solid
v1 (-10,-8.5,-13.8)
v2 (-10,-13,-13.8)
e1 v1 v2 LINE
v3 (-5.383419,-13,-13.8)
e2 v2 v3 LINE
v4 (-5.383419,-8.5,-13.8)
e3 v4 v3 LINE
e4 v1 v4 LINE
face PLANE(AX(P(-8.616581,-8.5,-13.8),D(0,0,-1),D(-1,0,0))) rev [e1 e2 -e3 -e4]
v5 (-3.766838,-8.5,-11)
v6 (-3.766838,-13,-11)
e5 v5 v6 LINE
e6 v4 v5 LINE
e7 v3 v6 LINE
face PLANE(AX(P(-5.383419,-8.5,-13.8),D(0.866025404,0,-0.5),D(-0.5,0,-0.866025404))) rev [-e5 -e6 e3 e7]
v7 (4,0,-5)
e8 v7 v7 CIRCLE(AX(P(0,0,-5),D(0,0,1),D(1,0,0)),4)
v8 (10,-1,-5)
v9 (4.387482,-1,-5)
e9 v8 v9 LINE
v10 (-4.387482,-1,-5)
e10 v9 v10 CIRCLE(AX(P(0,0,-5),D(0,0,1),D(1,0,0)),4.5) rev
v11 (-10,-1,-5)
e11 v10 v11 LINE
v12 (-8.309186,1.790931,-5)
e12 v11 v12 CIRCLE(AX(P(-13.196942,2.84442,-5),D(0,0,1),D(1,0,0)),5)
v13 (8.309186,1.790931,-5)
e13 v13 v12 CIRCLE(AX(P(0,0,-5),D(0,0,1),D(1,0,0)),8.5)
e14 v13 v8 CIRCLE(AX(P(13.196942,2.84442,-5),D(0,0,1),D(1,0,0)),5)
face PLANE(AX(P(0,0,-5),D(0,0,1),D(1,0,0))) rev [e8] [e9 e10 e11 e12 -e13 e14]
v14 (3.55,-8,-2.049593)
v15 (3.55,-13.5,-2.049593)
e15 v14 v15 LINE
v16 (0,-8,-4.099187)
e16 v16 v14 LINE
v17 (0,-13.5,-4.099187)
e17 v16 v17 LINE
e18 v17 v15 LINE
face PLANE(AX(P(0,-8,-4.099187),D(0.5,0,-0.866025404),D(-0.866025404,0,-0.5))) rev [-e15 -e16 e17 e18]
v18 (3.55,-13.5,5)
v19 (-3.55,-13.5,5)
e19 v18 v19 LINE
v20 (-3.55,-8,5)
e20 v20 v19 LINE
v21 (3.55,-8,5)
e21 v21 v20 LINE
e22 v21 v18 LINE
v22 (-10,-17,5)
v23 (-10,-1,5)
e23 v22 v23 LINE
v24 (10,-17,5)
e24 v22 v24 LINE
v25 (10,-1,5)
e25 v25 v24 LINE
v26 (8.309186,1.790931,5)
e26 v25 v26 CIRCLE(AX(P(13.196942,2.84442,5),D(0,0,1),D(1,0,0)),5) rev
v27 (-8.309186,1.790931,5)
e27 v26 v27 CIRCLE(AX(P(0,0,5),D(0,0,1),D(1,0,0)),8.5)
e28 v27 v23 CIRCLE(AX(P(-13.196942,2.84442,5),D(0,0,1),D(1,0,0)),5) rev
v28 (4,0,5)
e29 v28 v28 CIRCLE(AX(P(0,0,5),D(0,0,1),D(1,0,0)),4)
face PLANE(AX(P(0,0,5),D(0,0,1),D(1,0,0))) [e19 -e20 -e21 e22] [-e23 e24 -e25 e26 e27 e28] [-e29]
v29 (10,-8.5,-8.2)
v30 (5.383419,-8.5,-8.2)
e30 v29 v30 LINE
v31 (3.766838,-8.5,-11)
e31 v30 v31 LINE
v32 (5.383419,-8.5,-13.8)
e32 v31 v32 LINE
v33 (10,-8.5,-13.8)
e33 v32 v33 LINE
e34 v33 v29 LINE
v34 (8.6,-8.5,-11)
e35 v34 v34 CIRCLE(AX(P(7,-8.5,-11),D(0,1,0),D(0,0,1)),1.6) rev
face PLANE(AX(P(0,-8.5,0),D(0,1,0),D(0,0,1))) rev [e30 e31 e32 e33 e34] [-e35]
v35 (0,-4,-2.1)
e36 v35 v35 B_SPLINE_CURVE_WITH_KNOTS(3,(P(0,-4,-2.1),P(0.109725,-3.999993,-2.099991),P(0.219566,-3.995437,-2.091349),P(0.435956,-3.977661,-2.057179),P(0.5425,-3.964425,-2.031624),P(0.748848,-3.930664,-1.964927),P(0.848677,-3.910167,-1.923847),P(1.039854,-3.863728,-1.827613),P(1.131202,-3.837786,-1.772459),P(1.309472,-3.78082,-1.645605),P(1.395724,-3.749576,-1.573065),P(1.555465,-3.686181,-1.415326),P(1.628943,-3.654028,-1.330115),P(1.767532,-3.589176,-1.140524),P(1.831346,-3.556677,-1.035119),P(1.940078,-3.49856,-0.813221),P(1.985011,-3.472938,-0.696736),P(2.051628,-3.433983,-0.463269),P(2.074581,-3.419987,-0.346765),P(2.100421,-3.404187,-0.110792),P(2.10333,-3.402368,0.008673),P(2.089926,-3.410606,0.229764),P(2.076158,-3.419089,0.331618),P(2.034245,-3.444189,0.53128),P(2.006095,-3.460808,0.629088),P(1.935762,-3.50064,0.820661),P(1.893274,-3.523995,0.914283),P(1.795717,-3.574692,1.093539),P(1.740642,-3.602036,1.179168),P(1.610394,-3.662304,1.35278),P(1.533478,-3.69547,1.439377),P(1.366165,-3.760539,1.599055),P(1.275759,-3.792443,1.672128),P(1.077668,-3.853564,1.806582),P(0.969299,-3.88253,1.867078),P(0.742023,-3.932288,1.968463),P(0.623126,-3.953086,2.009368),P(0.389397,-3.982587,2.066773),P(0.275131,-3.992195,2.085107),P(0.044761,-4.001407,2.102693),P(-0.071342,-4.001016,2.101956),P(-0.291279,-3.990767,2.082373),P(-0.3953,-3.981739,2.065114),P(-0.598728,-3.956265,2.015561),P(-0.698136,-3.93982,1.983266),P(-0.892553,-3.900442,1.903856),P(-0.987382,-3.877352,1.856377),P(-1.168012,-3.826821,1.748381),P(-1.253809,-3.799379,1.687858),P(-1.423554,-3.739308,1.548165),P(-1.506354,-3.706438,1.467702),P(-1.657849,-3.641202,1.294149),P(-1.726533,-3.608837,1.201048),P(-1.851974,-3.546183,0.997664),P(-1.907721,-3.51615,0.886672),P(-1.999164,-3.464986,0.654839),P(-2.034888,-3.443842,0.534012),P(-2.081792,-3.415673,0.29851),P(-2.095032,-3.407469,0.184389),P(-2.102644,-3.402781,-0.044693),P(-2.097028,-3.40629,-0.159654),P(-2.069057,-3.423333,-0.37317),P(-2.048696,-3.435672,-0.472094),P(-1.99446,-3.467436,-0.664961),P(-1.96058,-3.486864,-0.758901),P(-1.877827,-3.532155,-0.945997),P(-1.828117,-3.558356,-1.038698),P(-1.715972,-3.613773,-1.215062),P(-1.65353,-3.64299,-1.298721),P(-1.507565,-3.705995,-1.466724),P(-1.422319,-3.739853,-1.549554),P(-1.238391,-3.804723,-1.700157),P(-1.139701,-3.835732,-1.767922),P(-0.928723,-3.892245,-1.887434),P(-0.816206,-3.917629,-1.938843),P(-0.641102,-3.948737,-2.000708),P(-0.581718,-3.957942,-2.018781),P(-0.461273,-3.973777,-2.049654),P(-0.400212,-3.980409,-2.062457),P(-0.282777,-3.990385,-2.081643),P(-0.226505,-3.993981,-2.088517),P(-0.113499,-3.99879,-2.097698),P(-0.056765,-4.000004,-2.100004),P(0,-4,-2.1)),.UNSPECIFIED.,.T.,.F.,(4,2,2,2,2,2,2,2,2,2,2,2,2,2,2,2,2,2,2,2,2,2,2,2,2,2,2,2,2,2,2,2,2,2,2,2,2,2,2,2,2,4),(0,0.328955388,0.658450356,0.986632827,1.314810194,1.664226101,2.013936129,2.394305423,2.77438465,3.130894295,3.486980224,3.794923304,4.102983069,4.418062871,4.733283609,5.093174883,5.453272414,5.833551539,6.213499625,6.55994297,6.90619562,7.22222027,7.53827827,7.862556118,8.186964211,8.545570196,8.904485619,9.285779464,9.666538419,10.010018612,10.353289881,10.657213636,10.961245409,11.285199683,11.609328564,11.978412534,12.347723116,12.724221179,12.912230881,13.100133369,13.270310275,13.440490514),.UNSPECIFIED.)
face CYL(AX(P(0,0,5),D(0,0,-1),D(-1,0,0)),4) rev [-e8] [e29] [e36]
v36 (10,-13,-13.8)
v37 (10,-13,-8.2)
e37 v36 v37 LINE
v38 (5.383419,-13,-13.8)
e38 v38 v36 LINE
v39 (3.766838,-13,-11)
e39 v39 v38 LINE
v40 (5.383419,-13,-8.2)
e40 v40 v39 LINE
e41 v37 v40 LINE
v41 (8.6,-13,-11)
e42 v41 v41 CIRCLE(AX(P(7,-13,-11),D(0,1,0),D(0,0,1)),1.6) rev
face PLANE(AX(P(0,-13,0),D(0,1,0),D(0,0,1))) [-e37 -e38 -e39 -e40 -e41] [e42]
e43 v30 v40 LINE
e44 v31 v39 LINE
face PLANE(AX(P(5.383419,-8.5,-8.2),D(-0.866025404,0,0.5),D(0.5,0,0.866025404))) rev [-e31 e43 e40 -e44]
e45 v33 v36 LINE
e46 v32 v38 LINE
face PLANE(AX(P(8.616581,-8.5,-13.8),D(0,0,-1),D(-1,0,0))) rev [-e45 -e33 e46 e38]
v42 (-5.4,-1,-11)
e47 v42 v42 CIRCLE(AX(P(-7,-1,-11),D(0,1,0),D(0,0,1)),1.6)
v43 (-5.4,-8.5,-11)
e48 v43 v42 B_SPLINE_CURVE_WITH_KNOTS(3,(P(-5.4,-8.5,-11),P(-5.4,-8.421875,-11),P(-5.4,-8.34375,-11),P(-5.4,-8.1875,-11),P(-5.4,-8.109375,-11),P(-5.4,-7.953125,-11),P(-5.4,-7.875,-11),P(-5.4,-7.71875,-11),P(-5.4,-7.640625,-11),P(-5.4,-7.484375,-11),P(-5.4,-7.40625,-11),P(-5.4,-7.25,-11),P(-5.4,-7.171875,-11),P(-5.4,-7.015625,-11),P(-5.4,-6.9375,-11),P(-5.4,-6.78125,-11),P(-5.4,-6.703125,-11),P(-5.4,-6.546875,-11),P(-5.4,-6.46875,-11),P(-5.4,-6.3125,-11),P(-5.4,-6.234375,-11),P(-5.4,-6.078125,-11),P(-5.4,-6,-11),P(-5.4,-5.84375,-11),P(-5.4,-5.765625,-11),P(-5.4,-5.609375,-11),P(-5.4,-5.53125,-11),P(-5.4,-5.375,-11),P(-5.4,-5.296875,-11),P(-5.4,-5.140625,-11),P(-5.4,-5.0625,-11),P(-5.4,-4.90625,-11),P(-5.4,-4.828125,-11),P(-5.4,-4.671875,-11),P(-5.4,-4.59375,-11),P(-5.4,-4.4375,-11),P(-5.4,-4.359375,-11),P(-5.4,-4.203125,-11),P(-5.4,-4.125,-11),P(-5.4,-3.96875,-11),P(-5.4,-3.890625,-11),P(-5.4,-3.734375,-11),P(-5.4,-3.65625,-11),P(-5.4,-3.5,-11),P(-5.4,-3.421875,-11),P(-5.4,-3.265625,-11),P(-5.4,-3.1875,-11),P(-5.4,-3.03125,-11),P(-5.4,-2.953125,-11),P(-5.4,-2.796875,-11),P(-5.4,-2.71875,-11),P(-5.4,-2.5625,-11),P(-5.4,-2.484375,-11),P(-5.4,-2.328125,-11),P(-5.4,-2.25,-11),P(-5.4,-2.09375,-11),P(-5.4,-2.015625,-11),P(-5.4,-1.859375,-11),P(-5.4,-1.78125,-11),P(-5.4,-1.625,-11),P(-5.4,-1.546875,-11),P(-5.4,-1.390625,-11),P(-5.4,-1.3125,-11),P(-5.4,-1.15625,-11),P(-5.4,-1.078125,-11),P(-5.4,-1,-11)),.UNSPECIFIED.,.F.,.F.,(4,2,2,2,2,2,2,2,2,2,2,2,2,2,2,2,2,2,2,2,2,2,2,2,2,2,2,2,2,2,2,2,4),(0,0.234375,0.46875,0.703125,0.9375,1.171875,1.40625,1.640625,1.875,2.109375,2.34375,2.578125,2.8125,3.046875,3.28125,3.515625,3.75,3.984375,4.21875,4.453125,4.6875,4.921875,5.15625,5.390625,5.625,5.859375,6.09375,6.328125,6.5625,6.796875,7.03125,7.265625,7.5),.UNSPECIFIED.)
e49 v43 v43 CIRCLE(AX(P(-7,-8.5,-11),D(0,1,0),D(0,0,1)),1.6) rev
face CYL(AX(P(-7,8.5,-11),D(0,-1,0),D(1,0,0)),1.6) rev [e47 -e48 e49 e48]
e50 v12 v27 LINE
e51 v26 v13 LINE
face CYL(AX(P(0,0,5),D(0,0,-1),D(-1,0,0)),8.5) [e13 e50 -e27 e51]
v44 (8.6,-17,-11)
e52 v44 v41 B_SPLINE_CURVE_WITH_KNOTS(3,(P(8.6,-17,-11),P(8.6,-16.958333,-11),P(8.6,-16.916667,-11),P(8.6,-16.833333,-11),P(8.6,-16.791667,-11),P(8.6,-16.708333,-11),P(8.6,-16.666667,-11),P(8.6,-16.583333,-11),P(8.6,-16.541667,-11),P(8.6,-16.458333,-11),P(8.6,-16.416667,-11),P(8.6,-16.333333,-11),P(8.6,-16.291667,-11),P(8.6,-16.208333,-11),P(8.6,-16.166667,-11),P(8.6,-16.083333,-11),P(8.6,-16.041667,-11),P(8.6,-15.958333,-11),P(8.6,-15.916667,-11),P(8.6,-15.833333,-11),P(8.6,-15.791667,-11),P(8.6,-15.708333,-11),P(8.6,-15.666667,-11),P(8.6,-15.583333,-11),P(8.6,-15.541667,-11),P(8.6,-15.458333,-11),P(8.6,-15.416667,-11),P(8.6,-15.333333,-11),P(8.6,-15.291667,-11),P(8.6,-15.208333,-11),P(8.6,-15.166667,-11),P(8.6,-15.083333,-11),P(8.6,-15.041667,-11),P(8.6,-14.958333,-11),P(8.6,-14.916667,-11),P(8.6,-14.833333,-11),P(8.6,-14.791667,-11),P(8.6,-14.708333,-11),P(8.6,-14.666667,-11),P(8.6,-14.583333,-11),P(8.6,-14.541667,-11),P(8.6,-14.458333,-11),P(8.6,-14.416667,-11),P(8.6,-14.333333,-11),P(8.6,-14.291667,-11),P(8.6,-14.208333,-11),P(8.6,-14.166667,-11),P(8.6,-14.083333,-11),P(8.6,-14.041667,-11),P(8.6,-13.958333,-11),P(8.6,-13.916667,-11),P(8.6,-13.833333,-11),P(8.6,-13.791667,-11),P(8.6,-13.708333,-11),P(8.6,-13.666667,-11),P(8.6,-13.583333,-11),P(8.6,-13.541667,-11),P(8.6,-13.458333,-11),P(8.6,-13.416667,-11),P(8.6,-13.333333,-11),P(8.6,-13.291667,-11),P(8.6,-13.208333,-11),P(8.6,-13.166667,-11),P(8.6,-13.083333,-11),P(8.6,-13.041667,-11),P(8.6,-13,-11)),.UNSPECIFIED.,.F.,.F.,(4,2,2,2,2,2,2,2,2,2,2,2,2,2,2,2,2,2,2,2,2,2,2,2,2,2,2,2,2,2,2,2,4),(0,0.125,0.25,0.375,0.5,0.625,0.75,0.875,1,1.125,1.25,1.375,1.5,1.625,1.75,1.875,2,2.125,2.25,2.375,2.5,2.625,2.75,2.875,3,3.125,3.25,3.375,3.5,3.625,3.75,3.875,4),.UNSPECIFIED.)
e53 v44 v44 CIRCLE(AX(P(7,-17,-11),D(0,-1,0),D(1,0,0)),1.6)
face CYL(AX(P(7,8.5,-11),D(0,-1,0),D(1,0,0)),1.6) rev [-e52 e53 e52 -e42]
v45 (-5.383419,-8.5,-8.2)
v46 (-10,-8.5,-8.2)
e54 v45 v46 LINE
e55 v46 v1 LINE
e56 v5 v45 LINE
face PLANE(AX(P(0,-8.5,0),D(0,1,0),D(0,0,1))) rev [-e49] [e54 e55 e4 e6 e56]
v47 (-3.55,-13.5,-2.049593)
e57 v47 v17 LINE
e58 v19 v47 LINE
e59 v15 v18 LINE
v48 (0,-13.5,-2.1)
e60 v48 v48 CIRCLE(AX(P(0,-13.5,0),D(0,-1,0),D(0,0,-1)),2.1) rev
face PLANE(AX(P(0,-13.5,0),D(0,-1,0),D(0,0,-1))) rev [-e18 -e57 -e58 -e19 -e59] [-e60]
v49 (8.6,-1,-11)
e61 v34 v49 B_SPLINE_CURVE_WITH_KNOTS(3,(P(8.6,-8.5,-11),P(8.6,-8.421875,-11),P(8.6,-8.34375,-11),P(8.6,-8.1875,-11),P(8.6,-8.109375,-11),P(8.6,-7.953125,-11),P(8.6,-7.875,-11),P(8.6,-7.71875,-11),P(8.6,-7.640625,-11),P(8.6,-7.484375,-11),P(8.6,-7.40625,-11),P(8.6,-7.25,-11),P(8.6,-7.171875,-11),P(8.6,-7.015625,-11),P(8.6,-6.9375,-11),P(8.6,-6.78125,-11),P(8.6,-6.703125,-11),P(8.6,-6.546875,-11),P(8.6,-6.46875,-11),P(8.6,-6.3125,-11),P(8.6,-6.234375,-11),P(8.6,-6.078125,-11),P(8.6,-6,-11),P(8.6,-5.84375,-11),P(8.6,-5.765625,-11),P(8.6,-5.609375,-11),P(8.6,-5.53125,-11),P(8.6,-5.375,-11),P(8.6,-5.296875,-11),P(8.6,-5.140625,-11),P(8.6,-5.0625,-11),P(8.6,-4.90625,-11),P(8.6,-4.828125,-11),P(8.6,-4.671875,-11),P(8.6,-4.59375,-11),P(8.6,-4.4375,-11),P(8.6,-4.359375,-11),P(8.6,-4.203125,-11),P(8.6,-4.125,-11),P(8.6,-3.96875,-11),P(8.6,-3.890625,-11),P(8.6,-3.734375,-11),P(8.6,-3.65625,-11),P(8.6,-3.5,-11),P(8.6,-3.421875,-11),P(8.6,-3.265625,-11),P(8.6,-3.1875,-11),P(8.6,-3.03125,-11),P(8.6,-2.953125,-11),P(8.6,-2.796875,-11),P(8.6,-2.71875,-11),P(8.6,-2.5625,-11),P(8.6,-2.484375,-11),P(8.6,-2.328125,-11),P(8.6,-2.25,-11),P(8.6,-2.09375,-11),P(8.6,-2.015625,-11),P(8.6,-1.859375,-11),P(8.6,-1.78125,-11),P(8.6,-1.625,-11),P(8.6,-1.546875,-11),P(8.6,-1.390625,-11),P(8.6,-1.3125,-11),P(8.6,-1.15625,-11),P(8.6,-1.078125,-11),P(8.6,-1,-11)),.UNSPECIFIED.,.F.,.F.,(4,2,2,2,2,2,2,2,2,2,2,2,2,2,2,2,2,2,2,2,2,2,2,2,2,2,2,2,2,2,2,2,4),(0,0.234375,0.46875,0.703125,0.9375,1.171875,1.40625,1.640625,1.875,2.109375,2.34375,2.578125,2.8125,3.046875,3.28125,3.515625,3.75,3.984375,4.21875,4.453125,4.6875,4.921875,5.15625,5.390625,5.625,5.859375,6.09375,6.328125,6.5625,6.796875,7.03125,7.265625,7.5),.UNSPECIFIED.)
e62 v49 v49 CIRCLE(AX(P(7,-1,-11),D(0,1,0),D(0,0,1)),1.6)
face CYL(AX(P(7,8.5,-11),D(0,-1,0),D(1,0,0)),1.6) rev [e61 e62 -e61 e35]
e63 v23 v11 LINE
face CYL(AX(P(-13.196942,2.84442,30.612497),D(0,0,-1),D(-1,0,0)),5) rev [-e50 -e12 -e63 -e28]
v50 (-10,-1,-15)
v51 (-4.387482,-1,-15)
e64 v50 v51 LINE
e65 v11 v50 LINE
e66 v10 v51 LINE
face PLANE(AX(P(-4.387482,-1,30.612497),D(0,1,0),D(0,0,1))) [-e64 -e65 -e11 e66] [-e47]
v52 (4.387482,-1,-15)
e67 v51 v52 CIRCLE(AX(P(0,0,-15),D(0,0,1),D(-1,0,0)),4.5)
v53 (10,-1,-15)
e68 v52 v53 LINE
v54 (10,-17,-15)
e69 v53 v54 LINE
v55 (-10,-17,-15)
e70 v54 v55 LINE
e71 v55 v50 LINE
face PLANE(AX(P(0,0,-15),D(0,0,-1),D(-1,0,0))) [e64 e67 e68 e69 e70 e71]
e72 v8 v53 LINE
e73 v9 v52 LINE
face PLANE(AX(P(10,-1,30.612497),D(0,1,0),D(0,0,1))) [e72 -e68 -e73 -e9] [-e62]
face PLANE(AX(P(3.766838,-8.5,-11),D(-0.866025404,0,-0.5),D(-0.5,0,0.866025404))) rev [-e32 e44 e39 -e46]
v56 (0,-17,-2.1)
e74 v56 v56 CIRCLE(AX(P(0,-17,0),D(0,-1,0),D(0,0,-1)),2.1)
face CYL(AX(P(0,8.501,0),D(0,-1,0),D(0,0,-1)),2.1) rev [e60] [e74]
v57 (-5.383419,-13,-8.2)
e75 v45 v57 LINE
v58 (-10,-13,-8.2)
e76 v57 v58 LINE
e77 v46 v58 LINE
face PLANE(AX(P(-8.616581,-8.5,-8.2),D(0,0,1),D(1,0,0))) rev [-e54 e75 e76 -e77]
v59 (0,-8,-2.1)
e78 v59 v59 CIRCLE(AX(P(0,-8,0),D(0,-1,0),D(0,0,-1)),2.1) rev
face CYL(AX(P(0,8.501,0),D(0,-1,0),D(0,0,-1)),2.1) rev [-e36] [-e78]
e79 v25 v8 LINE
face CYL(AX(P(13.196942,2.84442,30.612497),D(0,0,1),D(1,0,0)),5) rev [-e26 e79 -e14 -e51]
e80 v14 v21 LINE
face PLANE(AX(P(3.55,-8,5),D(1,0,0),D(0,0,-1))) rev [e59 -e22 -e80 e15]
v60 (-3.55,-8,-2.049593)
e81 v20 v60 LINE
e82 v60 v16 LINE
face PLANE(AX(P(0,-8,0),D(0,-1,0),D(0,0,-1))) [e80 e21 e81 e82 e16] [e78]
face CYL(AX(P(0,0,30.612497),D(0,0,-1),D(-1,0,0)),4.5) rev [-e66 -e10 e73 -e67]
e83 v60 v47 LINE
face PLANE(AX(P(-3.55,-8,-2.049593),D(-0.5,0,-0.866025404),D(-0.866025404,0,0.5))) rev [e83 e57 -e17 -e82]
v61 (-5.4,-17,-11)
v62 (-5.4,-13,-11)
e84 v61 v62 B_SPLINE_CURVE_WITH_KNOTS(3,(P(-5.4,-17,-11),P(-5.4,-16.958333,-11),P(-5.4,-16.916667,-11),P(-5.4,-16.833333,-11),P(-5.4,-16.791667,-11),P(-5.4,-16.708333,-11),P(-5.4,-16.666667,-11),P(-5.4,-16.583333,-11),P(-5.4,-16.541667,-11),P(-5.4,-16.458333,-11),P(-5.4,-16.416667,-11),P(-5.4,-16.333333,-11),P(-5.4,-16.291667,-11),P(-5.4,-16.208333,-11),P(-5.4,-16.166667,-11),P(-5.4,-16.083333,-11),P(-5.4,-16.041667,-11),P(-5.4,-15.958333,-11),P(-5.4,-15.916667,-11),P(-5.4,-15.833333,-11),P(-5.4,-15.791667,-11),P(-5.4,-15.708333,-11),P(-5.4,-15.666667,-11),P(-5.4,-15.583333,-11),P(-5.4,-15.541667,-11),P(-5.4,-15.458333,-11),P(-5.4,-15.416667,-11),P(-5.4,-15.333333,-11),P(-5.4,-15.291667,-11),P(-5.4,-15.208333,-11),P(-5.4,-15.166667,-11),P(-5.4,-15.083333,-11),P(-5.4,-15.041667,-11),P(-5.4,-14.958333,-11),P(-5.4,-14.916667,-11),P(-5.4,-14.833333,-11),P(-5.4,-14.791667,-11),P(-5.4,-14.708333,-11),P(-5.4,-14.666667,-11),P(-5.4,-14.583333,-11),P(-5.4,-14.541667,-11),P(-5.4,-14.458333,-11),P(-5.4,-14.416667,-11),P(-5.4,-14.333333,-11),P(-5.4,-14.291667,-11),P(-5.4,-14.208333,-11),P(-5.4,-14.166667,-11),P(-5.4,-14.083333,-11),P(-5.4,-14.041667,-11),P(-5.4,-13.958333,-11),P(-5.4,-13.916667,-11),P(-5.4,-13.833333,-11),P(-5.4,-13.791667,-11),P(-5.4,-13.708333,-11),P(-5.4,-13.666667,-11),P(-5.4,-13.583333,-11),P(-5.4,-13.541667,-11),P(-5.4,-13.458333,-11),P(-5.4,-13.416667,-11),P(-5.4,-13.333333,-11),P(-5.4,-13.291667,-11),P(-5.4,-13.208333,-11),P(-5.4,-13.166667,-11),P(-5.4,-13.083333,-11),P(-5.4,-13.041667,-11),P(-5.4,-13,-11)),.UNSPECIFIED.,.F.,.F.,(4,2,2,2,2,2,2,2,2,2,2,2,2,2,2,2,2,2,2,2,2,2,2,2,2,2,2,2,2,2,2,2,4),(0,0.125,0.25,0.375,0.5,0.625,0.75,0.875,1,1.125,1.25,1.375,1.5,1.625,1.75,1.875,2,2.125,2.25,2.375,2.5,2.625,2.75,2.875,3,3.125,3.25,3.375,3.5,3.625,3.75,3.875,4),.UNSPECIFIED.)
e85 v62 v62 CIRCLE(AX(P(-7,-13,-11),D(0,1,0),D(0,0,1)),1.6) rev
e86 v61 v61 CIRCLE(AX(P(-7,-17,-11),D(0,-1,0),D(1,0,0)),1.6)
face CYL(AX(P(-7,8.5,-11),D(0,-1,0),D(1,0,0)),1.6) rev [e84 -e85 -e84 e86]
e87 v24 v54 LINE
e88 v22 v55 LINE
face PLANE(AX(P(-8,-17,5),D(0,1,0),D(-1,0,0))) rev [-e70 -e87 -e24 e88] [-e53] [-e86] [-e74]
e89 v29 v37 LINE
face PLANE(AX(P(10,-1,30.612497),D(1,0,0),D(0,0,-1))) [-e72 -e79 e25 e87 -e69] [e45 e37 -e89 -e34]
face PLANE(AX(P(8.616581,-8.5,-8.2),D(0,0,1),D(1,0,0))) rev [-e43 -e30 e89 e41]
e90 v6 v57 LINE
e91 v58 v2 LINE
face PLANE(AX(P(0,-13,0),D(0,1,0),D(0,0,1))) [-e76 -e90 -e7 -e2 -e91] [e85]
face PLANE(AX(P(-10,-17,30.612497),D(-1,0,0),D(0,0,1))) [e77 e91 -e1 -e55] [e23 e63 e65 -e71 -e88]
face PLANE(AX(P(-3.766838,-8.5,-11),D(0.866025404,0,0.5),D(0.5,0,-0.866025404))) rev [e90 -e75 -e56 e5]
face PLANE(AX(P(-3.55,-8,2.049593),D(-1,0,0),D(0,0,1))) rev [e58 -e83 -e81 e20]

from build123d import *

# Parameters (mm, degrees)
SKETCH1_R                       = 4
BOSS_EXTRUDE1_DEPTH             = 5
BOSS_EXTRUDE2_DEPTH             = 10
BOSS_EXTRUDE2_DIRECTION_2_REACH = 23.477
CUT_EXTRUDE1_REACH              = 33.229
CUT_EXTRUDE1_END_RADIUS         = 4
SKETCH2_R                       = 2.1
CUT_EXTRUDE2_START              = -3.5
CUT_EXTRUDE2_DEPTH              = 5.5
FILLET1_R                       = 5
SKETCH5_R                       = 1.6
CUT_EXTRUDE3_DEPTH              = 32.228992939
CUT_EXTRUDE4_START              = -4
CUT_EXTRUDE4_DEPTH              = 4.5


with BuildPart() as part:
    # Sketch1 → Boss-Extrude1 (new, symmetric)
    with BuildSketch(Plane.XY):
        with BuildLine():
            Line((-8, -2.872281323), (-8, -17))
            Line((-8, -17), (8, -17))
            Line((8, -17), (8, -2.872281323))
            ThreePointArc((8, -2.872281323), (0, 8.5), (-8, -2.872281323))
        make_face()
        Circle(SKETCH1_R, mode=Mode.SUBTRACT)
    extrude(amount=BOSS_EXTRUDE1_DEPTH, both=True)

    # Sketch4 → Boss-Extrude2 (add)
    with BuildSketch(Plane(origin=(0, 0, -5), x_dir=(-1, 0, 0), z_dir=(0, 0, -1))):
        with BuildLine():
            Line((-10, -1), (-4.387482194, -1))
            ThreePointArc((-4.387482194, -1), (0, -4.5), (4.387482194, -1))
            Line((4.387482194, -1), (10, -1))
            Line((10, -1), (10, -17))
            Line((10, -17), (-10, -17))
            Line((-10, -17), (-10, -1))
        make_face()
    extrude(amount=BOSS_EXTRUDE2_DEPTH)

    # Boss-Extrude2 direction 2: up to this face of the body (flat: up to its plane)
    boss_extrude2_direction_2_end = Plane(part.part.faces().sort_by_distance((0, -5.649299223, 5))[0])
    # Sketch4 → Boss-Extrude2 direction 2 (add, up to the picked face)
    with BuildSketch(Plane(origin=(0, 0, -5), x_dir=(-1, 0, 0), z_dir=(0, 0, -1)), mode=Mode.PRIVATE) as boss_extrude2_direction_2_sk1:
        with BuildLine():
            Line((-10, -1), (-4.387482194, -1))
            ThreePointArc((-4.387482194, -1), (0, -4.5), (4.387482194, -1))
            Line((4.387482194, -1), (10, -1))
            Line((10, -1), (10, -17))
            Line((10, -17), (-10, -17))
            Line((-10, -17), (-10, -1))
        make_face()
    boss_extrude2_direction_2_tool1 = split(extrude(boss_extrude2_direction_2_sk1.sketch, amount=-BOSS_EXTRUDE2_DIRECTION_2_REACH, mode=Mode.PRIVATE), bisect_by=boss_extrude2_direction_2_end, keep=Keep.BOTH, mode=Mode.PRIVATE)
    add(boss_extrude2_direction_2_tool1.solids().sort_by(Axis((0, -9.503652, -5), (0, 0, 1)))[0])

    # Cut-Extrude1: up to this cylinder (the profile starts outside it)
    cut_extrude1_end = Plane(origin=(0, 0, 0), z_dir=(0, 0, -1)) * Cylinder(CUT_EXTRUDE1_END_RADIUS, 75.458, mode=Mode.PRIVATE)
    # Sketch2 → Cut-Extrude1 (cut, up to the surface)
    with BuildSketch(Plane.XZ.offset(17), mode=Mode.PRIVATE) as cut_extrude1_sk1:
        with Locations(Location((0, 0, 0), (0, 0, 270))):
            Circle(SKETCH2_R)
    cut_extrude1_tool1 = extrude(cut_extrude1_sk1.sketch, amount=-CUT_EXTRUDE1_REACH, mode=Mode.PRIVATE) - cut_extrude1_end
    add(cut_extrude1_tool1.solids().sort_by_distance((0, -17, 0))[0], mode=Mode.SUBTRACT)

    # Sketch3 → Cut-Extrude2 (cut)
    with BuildSketch(Plane.XZ.offset(17).offset(CUT_EXTRUDE2_START)):
        Polygon((-3.55, 2.049593456), (-3.55, 5), (3.55, 5), (3.55, 2.049593456), (3.55, -2.049593456), (0, -4.099186911), (-3.55, -2.049593456), align=None)
    extrude(amount=-CUT_EXTRUDE2_DEPTH, mode=Mode.SUBTRACT)

    # Fillet1
    # the kernel refuses this fillet: 5 mm, written as the material it adds along each edge
    with BuildSketch(Plane(origin=(-8.440971508, -1, -5), x_dir=(-1, 0, 0), z_dir=(0, 0, 1))) as fillet1_piece_1:
        with BuildLine():
            CenterArc((4.755970452, -3.844419605), FILLET1_R, 129.746228544, 38.09052624)
            Line((-0.131785829, -2.790930863), (-0.229540955, -2.769861088))
            ThreePointArc((-0.229540955, -2.769861088), (-0.050320463, -1.396200752), (-0.099305547, -0.011764706))
            Line((-0.099305547, -0.011764706), (0, 0.1))
            ThreePointArc((0, 0.1), (0.779514246, 0.1), (1.495089653, 0.076888392))
            Line((1.495089653, 0.076888392), (1.559028492, 0))
        make_face()
    extrude(amount=10)
    with BuildSketch(Plane(origin=(8.440971508, -1, -5), x_dir=(1, 0, 0), z_dir=(0, 0, 1))) as fillet1_piece_2:
        with BuildLine():
            CenterArc((4.755970452, 3.844419605), FILLET1_R, 192.163245216, 38.09052624)
            Line((-0.131785829, 2.790930863), (-0.229540955, 2.769861088))
            ThreePointArc((-0.229540955, 2.769861088), (-0.050320463, 1.396200752), (-0.099305547, 0.011764706))
            Line((-0.099305547, 0.011764706), (0, -0.1))
            ThreePointArc((0, -0.1), (0.779514246, -0.1), (1.495089653, -0.076888392))
            Line((1.495089653, -0.076888392), (1.559028492, 0))
        make_face()
    extrude(amount=10)

    # Sketch5 → Cut-Extrude3 (cut, through all)
    with BuildSketch(Plane.XZ.offset(17)):
        with Locations((7, -11)):
            Circle(SKETCH5_R)
        with Locations((-7, -11)):
            Circle(SKETCH5_R)
    extrude(amount=-CUT_EXTRUDE3_DEPTH, mode=Mode.SUBTRACT)

    # Sketch6 → Cut-Extrude4 (cut)
    with BuildSketch(Plane.XZ.offset(17).offset(CUT_EXTRUDE4_START)):
        Polygon((-8.616580754, -8.2), (-10, -8.2), (-10, -13.8), (-8.616580754, -13.8), (-5.383419246, -13.8), (-3.766838493, -11), (-5.383419246, -8.2), align=None)
        Polygon((8.616580754, -8.2), (5.383419246, -8.2), (3.766838493, -11), (5.383419246, -13.8), (8.616580754, -13.8), (10, -13.8), (10, -8.2), align=None)
    extrude(amount=-CUT_EXTRUDE4_DEPTH, mode=Mode.SUBTRACT)


solid = part.part
